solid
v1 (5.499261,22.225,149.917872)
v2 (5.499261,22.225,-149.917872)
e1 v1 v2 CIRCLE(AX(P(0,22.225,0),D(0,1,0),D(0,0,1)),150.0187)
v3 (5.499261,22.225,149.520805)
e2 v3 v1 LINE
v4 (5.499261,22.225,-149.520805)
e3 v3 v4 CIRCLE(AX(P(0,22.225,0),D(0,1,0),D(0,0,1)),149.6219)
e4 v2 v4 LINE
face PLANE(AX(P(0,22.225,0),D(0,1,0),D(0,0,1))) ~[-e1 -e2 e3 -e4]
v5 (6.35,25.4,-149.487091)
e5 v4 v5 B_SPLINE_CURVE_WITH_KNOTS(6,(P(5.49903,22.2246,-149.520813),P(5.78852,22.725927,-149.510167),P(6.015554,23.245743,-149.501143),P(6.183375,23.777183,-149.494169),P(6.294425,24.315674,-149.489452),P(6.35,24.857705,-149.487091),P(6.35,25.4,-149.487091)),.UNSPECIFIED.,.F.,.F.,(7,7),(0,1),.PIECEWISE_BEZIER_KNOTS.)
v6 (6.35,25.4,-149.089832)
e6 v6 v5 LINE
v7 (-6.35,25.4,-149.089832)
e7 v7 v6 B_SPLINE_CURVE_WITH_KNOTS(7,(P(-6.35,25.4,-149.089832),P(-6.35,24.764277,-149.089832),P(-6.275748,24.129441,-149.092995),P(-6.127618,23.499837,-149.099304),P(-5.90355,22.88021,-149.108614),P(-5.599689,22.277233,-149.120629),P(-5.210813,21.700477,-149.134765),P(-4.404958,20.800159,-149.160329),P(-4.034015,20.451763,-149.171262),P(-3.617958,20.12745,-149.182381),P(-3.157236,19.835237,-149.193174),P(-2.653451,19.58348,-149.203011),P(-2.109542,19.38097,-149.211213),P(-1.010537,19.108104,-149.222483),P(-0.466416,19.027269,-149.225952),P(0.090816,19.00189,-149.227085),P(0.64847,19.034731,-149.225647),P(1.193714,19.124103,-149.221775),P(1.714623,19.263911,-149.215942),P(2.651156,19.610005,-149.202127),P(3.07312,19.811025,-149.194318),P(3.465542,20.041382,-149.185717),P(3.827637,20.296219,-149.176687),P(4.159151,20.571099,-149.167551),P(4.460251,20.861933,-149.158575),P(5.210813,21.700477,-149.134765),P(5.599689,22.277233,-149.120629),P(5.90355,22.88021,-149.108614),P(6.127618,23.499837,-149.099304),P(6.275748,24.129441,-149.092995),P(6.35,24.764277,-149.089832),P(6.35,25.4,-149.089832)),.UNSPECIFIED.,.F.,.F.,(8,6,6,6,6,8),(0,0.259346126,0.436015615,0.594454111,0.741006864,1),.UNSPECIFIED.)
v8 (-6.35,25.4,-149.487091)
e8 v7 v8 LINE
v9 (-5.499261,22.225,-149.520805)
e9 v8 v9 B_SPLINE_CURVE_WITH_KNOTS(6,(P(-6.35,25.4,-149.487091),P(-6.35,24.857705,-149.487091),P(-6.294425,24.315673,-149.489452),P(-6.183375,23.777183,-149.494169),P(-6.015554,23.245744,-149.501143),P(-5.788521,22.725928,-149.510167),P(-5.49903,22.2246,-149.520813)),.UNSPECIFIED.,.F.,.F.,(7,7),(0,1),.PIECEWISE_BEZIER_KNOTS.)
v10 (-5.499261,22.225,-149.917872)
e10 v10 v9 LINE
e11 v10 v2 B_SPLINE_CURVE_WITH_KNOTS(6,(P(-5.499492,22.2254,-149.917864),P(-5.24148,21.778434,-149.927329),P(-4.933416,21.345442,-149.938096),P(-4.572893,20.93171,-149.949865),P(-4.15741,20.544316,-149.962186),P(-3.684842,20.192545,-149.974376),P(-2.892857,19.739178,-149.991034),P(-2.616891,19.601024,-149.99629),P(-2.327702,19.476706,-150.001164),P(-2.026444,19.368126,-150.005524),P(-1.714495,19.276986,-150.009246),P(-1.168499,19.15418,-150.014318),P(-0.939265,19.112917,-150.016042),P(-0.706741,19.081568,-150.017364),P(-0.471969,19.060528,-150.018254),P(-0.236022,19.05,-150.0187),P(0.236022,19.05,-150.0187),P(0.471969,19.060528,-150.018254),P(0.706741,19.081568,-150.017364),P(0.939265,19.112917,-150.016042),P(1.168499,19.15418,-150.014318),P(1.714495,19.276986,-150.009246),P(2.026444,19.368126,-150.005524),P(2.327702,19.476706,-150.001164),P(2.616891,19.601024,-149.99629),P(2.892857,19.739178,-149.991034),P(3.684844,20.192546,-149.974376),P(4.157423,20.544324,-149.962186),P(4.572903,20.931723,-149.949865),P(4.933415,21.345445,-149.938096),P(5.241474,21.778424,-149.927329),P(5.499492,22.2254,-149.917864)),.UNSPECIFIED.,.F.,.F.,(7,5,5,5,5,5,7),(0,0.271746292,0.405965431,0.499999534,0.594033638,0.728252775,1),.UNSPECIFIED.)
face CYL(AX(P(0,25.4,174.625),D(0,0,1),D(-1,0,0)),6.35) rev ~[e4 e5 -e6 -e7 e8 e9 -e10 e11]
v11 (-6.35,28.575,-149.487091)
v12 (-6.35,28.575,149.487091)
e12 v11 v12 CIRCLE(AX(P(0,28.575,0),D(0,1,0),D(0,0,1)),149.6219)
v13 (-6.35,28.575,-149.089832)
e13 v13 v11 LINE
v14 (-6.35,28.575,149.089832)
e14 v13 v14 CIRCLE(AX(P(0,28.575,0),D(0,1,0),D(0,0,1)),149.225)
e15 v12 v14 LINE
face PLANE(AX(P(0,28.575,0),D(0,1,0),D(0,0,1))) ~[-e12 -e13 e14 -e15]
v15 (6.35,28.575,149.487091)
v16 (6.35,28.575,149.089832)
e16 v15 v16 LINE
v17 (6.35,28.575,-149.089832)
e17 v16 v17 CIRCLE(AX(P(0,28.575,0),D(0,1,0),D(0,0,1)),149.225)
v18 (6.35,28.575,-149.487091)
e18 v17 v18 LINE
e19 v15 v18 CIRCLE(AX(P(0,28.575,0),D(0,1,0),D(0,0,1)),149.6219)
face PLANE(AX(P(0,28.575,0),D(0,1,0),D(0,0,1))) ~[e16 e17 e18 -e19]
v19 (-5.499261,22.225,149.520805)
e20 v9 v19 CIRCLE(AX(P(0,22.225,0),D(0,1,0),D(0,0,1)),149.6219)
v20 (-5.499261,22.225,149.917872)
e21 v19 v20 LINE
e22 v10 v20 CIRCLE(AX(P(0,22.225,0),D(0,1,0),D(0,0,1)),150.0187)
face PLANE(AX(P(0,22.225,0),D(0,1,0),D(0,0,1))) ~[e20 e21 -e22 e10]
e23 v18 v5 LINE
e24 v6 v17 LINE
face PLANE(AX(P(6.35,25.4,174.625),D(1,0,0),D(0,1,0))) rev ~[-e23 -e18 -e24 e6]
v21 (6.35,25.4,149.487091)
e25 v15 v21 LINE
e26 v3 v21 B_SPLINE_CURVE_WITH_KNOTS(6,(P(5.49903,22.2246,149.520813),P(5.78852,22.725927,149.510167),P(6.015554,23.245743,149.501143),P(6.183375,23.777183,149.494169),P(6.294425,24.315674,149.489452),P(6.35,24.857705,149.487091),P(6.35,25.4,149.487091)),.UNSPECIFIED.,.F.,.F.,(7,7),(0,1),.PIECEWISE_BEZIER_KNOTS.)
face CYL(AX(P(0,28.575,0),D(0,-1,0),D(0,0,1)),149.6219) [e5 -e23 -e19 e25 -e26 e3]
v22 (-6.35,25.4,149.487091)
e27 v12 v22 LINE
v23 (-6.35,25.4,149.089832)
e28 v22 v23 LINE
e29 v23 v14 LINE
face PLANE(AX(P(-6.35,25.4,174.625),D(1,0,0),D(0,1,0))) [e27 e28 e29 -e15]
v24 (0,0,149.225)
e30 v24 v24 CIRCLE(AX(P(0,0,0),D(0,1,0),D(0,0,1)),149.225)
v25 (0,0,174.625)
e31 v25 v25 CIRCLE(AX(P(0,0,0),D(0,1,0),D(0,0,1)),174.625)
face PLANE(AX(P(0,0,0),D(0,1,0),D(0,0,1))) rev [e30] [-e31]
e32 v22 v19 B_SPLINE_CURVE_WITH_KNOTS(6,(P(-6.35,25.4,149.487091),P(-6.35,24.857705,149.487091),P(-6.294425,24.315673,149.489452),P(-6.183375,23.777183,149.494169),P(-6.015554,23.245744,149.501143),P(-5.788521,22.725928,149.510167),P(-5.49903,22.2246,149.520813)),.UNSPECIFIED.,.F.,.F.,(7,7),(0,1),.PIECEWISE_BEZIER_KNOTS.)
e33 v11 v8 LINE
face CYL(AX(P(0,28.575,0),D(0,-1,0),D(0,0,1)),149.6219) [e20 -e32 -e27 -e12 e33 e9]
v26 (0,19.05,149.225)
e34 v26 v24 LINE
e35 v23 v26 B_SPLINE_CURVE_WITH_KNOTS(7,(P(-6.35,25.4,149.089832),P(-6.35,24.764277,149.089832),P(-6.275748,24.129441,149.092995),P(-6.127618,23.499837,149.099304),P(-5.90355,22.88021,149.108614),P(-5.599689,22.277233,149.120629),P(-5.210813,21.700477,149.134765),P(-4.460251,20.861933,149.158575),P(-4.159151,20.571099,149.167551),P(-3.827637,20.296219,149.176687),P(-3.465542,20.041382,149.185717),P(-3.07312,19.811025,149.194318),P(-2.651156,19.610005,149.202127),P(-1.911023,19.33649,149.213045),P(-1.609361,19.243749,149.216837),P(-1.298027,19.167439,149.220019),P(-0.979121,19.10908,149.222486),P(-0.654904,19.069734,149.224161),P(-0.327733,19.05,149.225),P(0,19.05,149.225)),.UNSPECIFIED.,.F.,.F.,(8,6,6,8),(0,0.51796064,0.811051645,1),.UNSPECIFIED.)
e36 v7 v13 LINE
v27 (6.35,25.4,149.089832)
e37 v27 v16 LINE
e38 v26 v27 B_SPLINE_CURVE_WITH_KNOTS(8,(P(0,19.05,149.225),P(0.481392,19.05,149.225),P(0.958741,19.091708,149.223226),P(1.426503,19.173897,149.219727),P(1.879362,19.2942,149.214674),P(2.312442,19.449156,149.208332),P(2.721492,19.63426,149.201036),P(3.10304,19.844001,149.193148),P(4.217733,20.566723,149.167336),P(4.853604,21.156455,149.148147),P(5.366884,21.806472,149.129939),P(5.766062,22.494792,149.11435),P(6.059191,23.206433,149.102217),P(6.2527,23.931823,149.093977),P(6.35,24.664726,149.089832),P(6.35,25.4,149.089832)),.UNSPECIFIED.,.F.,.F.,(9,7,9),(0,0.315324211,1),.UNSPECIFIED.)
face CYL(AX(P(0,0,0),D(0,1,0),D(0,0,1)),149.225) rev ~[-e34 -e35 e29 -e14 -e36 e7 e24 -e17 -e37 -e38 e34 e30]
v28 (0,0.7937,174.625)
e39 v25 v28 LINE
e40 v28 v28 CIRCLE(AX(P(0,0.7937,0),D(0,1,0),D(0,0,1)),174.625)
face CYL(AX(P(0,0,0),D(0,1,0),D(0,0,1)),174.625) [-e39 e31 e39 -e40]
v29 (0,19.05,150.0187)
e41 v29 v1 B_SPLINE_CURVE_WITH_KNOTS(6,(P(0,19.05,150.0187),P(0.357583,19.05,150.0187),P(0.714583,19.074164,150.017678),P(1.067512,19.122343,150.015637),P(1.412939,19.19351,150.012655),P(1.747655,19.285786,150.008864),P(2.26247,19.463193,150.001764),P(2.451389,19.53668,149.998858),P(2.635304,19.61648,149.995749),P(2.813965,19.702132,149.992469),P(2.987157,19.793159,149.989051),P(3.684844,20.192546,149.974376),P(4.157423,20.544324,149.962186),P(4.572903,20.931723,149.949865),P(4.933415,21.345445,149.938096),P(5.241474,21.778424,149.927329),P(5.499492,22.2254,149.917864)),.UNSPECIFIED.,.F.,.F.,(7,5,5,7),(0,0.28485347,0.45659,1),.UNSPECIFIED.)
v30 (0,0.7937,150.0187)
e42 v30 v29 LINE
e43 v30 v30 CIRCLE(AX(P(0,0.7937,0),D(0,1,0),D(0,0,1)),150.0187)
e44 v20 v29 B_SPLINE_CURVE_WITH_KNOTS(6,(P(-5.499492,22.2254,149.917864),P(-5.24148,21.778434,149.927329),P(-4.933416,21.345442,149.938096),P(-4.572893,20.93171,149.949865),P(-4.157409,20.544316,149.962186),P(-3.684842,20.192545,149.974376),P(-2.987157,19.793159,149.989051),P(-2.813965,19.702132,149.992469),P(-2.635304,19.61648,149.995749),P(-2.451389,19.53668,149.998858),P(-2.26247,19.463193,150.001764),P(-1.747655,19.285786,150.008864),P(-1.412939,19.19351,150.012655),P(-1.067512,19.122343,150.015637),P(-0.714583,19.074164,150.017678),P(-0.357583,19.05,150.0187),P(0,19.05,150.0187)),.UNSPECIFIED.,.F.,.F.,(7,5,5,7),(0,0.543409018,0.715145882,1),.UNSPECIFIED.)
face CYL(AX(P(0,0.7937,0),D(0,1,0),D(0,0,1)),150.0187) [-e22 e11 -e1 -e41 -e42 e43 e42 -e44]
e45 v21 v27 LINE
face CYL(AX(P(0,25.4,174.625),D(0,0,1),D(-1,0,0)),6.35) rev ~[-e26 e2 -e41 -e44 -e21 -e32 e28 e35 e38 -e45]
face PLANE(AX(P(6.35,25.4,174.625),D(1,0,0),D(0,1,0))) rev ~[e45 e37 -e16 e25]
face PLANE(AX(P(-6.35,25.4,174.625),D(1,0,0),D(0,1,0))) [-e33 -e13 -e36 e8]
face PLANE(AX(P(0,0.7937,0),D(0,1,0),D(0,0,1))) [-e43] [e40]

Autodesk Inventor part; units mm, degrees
ref_plane "YZ Plane" through (0, 0, 0) normal (1, 0, 0) x (0, 1, 0)
ref_plane "XZ Plane" through (0, 0, 0) normal (0, 1, 0) x (-1, 0, 0)
sketch "Sketch1" plane through (0, 0, 0) normal (1, 0, 0) x (0, 1, 0)
  line L0 (0, 0) -> (1.9826, 0)
  line L1 (0, 149.225) -> (25.4, 149.225)
  line L2 (0, 149.225) -> (0, 174.625)
  line L3 (0, 174.625) -> (0.7937, 174.625)
  line L4 (0.7937, 174.625) -> (0.7937, 150.0187)
  line L5 (0.7937, 150.0187) -> (22.225, 150.0187)
  line L6 (25.4, 149.6219) -> (25.4, 149.225)
  line L7 (25.4, 149.225) -> (28.575, 149.225)
  line L8 (28.575, 149.225) -> (28.575, 149.6219)
  line L9 (28.575, 149.6219) -> (22.225, 149.6219)
  line L10 (22.225, 149.6219) -> (22.225, 150.0187)
  point P0 (0.3969, 174.625)
  dimension "d0" = 25.4
  dimension "d1" = 149.225
  dimension "d2" = 25.4
  dimension "d3" = 0.7937
  dimension "d4" = 24.6062
  dimension "d5" = 3.175
  dimension "d6" = 6.35
revolve "Revolution1" add sketch "Sketch1" angle 360 about axis through (0, 0, 0) along (0, 1, 0)
ref_plane "Work Plane1" through (0, 0.3969, 174.625) normal (0, 0, 1) x (1, 0, 0)
sketch "Sketch2" plane through (0, 0.3969, 174.625) normal (0, 0, 1) x (1, 0, 0)
  line L0 (149.6219, 28.1781) -> (-149.6219, 28.1781) projected
  arc A0 (-6.35, 25.0031) -> (6.35, 25.0031) centre (0, 25.0031) ccw
  line L1 (-6.35, 25.0031) -> (-6.35, 28.1781)
  line L2 (6.35, 25.0031) -> (6.35, 28.1781)
  line L3 (149.225, 28.1781) -> (-149.225, 28.1781) projected
  line L4 (-6.35, 28.1781) -> (6.35, 28.1781)
  point P0 (0, -0.3969)
  dimension "d8" = 3.175
  dimension "d9" = 0
  dimension "d10" = 12.7
extrude "Extrusion1" cut sketch "Sketch2" against normal through all
properties part number "Layer2_Bottom"
